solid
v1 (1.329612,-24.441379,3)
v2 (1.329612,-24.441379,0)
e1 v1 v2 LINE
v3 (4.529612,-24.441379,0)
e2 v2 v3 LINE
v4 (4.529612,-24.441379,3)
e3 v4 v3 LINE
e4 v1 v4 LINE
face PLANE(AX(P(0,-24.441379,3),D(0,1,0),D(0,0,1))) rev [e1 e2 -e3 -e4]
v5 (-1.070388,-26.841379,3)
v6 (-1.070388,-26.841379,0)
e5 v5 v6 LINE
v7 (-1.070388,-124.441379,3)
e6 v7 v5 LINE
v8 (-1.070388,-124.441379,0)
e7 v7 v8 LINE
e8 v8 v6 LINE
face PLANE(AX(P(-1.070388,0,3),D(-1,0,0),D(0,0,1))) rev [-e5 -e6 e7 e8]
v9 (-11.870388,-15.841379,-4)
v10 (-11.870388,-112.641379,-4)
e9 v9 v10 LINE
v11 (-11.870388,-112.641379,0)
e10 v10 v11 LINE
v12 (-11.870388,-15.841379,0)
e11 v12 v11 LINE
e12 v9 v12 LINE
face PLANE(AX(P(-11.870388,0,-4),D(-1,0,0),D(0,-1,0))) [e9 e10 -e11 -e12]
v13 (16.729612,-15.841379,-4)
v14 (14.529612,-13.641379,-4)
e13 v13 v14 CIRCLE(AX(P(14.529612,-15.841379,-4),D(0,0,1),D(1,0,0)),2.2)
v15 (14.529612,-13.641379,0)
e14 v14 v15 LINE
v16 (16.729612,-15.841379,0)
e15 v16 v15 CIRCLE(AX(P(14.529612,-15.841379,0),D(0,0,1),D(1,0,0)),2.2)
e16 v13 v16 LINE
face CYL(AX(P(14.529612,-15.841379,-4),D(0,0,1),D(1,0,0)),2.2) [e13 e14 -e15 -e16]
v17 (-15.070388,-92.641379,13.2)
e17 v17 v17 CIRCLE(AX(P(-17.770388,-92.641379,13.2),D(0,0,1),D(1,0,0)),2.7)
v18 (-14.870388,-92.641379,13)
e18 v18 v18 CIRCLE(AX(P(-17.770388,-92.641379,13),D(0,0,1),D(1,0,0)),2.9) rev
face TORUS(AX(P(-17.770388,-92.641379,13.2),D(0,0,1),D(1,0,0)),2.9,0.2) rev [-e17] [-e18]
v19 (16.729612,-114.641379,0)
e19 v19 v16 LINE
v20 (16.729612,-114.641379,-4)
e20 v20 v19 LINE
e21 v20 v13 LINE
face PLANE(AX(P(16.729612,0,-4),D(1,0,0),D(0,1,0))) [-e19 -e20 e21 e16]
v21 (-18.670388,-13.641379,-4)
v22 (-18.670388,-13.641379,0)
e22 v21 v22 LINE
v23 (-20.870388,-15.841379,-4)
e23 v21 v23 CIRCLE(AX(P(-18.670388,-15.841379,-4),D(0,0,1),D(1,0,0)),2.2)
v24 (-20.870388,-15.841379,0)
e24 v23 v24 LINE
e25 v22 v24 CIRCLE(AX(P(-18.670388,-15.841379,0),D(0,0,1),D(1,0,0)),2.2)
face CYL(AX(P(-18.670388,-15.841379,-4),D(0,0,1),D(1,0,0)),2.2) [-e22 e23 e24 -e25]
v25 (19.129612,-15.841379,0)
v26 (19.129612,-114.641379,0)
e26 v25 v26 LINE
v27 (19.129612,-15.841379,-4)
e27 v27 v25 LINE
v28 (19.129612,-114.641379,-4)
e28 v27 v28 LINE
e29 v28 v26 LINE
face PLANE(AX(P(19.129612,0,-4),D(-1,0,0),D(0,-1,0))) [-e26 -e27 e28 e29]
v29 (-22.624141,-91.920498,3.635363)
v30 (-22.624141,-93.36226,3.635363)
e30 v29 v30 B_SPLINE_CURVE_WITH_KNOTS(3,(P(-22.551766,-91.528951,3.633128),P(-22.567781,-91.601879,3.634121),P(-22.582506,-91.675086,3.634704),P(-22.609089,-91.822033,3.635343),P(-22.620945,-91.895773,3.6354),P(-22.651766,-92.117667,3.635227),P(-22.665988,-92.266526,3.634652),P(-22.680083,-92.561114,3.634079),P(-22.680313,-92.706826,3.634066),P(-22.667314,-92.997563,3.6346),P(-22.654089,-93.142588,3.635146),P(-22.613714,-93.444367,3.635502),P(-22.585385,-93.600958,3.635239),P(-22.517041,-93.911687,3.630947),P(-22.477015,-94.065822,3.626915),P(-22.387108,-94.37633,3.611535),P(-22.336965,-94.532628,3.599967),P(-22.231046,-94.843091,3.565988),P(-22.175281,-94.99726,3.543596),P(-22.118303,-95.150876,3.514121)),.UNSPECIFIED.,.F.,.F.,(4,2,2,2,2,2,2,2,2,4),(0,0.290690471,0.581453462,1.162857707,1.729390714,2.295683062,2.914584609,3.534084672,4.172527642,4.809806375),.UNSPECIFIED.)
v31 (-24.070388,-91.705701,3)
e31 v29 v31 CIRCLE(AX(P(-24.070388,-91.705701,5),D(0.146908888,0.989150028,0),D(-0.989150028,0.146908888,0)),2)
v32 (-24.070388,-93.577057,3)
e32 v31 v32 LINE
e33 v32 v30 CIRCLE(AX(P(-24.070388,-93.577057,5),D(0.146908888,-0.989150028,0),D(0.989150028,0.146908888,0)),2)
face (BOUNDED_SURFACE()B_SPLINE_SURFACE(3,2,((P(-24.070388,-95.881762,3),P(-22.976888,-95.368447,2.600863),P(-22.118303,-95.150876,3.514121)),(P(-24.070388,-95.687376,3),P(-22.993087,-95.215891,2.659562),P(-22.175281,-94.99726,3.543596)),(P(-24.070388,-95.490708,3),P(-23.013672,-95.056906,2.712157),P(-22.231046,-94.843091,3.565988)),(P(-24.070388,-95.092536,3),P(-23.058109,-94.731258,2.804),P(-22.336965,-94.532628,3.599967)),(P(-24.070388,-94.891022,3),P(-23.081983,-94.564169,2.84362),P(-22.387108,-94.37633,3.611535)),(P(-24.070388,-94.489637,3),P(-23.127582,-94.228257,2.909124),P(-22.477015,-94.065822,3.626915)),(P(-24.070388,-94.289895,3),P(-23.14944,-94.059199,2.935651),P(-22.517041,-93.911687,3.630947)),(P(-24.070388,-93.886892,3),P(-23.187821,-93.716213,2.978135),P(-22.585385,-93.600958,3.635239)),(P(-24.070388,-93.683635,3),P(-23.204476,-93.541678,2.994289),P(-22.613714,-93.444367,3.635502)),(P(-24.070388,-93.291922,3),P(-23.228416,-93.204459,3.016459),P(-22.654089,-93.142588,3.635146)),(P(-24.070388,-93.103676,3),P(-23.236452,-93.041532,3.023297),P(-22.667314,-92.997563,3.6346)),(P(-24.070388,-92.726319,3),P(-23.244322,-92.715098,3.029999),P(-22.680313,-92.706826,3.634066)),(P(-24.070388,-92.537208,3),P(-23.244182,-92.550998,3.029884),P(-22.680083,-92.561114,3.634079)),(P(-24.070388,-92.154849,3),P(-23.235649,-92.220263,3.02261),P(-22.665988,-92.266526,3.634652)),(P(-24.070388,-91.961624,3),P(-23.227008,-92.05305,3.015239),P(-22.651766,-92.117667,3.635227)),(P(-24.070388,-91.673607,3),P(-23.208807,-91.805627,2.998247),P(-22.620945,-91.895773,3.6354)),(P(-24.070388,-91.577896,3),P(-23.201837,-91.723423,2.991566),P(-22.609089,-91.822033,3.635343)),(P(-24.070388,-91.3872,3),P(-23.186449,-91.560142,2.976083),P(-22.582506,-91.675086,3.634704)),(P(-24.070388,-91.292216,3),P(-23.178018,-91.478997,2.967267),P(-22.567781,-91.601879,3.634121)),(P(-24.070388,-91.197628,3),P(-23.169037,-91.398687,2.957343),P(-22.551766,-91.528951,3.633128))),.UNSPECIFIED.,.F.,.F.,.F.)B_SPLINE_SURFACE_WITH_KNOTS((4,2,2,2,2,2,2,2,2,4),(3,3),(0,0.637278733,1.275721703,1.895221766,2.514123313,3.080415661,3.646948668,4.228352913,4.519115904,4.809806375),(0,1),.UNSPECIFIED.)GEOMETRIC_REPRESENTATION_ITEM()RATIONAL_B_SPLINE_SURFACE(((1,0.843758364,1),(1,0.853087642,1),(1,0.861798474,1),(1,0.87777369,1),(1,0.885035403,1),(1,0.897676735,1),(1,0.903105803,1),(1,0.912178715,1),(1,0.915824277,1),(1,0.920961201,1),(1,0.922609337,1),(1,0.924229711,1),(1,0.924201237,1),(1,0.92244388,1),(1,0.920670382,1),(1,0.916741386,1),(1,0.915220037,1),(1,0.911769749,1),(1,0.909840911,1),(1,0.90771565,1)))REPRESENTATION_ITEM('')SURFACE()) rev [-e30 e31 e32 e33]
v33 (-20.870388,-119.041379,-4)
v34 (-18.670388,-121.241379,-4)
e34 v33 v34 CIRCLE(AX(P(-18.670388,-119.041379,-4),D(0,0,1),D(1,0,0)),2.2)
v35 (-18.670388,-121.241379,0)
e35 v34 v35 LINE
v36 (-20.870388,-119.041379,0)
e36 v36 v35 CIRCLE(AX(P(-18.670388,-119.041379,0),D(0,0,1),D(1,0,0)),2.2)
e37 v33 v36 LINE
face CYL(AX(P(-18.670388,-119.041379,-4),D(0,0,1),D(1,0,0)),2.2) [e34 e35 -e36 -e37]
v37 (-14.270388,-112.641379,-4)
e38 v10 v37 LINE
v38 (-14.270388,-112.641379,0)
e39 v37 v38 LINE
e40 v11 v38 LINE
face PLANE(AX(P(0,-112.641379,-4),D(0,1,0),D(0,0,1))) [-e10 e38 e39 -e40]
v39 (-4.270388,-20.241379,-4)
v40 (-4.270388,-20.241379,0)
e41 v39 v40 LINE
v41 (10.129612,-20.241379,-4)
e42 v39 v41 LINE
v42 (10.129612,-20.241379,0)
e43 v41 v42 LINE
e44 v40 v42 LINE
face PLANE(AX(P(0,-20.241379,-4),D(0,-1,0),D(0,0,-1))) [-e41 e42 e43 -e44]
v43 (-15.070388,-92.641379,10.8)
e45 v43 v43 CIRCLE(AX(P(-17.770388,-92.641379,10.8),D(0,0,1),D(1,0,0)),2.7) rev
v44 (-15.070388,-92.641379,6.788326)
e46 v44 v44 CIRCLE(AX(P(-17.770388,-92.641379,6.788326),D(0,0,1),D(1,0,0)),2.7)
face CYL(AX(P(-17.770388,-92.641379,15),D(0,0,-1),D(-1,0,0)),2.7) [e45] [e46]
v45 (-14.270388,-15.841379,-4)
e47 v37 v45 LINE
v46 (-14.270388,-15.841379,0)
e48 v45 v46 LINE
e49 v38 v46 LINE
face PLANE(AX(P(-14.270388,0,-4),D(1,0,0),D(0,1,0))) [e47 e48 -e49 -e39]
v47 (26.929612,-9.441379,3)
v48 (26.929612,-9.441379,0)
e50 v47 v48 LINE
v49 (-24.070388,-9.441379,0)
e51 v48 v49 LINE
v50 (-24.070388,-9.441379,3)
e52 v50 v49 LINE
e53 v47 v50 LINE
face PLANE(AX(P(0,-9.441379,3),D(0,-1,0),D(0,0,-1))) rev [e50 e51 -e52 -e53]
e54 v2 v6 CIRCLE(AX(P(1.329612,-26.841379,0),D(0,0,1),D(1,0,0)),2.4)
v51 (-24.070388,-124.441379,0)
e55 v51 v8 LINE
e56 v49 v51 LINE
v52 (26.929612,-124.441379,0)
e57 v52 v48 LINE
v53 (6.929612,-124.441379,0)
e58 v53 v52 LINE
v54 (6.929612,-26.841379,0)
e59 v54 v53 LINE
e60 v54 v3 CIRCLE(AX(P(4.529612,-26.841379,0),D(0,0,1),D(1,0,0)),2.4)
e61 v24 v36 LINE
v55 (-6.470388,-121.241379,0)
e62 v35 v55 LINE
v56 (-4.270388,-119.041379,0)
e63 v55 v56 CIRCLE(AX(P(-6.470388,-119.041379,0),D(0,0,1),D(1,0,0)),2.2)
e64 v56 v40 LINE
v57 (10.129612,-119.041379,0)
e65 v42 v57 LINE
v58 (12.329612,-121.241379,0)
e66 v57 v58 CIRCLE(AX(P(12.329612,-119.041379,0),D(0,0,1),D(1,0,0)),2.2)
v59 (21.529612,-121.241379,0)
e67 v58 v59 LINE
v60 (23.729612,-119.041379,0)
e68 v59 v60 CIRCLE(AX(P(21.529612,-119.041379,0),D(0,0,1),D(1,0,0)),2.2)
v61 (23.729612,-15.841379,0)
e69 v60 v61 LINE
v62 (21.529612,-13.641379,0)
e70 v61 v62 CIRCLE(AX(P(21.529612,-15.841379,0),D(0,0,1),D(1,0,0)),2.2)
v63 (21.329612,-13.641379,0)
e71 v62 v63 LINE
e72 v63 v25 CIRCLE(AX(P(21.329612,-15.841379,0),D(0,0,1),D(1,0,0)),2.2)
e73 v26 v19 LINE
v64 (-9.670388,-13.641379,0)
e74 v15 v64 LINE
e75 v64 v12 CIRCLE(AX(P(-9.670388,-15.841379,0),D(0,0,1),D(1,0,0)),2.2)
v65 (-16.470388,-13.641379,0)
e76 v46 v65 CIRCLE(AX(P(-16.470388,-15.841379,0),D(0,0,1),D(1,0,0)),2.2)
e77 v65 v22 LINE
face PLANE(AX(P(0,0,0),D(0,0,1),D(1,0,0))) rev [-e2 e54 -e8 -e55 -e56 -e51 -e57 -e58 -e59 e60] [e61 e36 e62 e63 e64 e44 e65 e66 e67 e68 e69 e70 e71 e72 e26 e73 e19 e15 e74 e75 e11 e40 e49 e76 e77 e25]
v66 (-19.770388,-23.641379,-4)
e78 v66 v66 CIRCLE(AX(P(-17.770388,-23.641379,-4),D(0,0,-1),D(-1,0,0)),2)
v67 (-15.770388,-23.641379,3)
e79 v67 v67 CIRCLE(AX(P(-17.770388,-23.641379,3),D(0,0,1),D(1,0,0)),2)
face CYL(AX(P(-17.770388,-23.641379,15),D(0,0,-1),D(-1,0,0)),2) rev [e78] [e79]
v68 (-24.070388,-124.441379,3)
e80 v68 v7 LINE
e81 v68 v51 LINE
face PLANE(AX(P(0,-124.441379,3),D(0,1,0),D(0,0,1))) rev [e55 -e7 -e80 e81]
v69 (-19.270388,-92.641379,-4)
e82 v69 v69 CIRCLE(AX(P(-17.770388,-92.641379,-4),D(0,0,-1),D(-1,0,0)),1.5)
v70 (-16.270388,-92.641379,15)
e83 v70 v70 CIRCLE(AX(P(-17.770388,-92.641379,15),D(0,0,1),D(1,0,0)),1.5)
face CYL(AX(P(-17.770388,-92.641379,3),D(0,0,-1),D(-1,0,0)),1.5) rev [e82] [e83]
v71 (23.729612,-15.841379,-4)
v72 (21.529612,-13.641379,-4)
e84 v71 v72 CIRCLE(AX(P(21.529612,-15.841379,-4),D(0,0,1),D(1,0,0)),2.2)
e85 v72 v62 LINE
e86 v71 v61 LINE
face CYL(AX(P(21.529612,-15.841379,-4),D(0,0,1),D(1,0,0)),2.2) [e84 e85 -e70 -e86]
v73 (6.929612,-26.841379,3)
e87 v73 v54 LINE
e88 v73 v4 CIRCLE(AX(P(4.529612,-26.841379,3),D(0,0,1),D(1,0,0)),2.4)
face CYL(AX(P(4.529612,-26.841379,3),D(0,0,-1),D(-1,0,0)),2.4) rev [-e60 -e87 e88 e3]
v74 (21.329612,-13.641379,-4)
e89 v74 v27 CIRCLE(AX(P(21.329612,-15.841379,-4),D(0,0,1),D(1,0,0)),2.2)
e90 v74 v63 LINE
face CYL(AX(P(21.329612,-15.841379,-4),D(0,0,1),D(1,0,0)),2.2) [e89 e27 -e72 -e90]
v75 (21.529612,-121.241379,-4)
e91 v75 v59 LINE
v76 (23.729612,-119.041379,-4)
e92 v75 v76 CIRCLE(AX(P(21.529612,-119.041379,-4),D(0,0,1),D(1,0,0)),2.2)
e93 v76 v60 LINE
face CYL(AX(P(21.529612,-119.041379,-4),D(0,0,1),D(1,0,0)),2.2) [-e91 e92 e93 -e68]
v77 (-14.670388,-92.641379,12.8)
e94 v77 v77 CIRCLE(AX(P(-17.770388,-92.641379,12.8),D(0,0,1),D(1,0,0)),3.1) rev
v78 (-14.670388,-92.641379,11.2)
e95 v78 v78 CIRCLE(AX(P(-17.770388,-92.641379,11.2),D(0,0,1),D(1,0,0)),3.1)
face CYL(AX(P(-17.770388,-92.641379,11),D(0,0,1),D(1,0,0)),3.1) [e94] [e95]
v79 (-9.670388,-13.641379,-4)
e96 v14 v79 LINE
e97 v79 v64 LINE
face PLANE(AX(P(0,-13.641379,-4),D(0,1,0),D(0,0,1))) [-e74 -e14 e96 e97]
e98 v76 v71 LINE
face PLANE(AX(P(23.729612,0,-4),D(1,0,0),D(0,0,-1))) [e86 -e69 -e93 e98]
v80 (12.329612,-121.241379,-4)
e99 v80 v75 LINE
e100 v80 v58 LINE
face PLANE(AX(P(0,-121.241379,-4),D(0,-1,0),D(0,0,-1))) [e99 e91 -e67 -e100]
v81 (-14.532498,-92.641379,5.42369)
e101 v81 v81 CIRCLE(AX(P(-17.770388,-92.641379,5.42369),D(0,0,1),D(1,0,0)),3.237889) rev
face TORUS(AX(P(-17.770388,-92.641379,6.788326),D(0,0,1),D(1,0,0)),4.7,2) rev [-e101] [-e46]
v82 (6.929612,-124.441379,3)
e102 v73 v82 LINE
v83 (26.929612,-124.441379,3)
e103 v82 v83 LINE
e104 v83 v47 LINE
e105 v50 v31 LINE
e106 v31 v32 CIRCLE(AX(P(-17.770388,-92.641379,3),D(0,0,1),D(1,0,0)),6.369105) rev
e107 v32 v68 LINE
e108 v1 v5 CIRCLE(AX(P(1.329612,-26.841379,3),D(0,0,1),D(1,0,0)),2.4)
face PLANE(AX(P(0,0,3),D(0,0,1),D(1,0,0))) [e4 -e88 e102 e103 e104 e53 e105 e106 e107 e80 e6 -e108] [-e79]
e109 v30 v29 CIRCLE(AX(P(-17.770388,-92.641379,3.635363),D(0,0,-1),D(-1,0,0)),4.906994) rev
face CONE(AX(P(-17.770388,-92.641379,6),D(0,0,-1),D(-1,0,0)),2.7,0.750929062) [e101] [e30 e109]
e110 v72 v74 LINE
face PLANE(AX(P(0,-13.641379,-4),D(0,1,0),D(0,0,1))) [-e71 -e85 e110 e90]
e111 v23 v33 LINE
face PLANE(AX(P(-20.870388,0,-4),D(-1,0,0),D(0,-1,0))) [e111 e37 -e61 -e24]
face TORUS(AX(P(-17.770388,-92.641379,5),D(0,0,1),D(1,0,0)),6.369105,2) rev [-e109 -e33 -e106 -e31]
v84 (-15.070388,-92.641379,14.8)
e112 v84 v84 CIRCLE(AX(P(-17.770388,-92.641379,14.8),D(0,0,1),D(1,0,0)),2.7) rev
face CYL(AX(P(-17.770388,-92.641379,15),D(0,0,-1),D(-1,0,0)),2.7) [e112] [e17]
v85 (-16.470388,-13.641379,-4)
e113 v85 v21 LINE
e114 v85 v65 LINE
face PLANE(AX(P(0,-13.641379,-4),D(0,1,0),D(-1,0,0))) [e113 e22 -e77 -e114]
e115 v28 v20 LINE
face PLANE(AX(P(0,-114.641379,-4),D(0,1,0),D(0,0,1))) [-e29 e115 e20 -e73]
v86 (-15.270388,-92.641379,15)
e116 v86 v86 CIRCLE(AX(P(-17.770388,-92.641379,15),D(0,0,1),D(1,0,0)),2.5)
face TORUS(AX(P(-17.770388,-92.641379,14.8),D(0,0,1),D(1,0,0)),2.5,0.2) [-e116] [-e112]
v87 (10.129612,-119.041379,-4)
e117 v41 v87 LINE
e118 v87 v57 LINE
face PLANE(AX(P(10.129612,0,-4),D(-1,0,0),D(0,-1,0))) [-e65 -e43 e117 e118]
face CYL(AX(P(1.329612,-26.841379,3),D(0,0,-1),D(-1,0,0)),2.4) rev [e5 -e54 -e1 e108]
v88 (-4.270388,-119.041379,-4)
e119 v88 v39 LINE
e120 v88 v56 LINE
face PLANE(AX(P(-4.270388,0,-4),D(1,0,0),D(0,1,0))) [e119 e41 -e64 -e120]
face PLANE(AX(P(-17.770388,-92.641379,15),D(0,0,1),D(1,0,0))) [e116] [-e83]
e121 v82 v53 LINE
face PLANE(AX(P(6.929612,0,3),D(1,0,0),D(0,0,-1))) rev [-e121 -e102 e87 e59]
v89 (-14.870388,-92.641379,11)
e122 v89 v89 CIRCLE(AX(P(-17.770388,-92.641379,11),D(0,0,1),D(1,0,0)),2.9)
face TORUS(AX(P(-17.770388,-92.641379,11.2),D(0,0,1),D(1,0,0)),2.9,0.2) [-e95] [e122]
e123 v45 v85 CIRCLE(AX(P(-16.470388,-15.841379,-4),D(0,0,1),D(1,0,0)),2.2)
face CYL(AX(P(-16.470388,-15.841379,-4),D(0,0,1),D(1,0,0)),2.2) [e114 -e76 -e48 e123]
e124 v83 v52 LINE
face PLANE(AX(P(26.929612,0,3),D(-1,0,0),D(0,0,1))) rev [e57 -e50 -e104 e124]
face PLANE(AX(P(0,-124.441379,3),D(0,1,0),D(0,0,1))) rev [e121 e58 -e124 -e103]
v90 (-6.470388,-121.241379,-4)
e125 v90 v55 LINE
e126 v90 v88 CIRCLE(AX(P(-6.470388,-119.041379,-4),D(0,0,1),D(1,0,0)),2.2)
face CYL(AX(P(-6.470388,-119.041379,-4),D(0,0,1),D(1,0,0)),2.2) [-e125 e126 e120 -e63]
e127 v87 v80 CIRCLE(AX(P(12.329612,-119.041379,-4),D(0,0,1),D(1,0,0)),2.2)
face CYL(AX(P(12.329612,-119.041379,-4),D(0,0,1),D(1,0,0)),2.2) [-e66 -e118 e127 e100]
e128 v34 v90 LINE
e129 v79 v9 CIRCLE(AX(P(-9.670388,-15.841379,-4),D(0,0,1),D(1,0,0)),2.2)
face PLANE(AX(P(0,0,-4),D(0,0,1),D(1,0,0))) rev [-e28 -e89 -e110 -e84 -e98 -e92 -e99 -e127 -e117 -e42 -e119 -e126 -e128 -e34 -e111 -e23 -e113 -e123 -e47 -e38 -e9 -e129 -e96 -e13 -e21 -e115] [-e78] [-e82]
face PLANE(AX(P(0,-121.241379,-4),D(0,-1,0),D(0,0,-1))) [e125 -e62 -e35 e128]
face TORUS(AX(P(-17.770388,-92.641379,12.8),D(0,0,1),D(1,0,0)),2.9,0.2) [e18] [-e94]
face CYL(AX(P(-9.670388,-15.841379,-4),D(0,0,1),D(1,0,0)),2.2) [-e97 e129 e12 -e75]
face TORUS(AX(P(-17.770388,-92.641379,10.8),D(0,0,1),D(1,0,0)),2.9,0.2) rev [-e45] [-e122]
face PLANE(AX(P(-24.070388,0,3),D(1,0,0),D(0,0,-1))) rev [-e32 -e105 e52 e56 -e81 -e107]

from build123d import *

# Parameters (mm, degrees)
BOSS_EXTRUDE1_DEPTH = 4
BOSS_EXTRUDE2_DEPTH = 3
SKETCH2_R           = 1.5
CUT_EXTRUDE1_DEPTH  = 128.51415942
SKETCH3_R           = 5.5
SKETCH5_R           = 2.7
SKETCH5_35_R        = 2.7
SKETCH5_35_R_2      = 1.5
BOSS_EXTRUDE3_DEPTH = 9
SKETCH6_R           = 2
CUT_EXTRUDE2_DEPTH  = 129.731739881
BOSS_EXTRUDE4_START = -2
SKETCH4_R           = 3.1
SKETCH4_R_2         = 2.7
BOSS_EXTRUDE4_DEPTH = 2
FILLET1_R           = 2
FILLET2_R           = 0.2
SKETCH3_52_R        = 1.5
CUT_EXTRUDE3_DEPTH  = 128.886124648


with BuildPart() as part:
    # Sketch1 → Boss-Extrude1 (new body)
    with BuildSketch(Plane.XY):
        with BuildLine():
            Line((-20.870387638, -15.841379094), (-20.870387638, -119.041379094))
            ThreePointArc((-20.870387638, -119.041379094), (-20.226022556, -120.597014012), (-18.670387638, -121.241379094))
            Line((-18.670387638, -121.241379094), (-6.470387638, -121.241379094))
            ThreePointArc((-6.470387638, -121.241379094), (-4.914752719, -120.597014012), (-4.270387638, -119.041379094))
            Line((-4.270387638, -119.041379094), (-4.270387638, -20.241379094))
            Line((-4.270387638, -20.241379094), (10.129612362, -20.241379094))
            Line((10.129612362, -20.241379094), (10.129612362, -119.041379094))
            ThreePointArc((10.129612362, -119.041379094), (10.773977444, -120.597014012), (12.329612362, -121.241379094))
            Line((12.329612362, -121.241379094), (21.529612362, -121.241379094))
            ThreePointArc((21.529612362, -121.241379094), (23.085247281, -120.597014012), (23.729612362, -119.041379094))
            Line((23.729612362, -119.041379094), (23.729612362, -15.841379094))
            ThreePointArc((23.729612362, -15.841379094), (23.085247281, -14.285744175), (21.529612362, -13.641379094))
            Line((21.529612362, -13.641379094), (21.329612362, -13.641379094))
            ThreePointArc((21.329612362, -13.641379094), (19.773977444, -14.285744175), (19.129612362, -15.841379094))
            Line((19.129612362, -15.841379094), (19.129612362, -114.641379094))
            Line((19.129612362, -114.641379094), (16.729612362, -114.641379094))
            Line((16.729612362, -114.641379094), (16.729612362, -15.841379094))
            ThreePointArc((16.729612362, -15.841379094), (16.085247281, -14.285744175), (14.529612362, -13.641379094))
            Line((14.529612362, -13.641379094), (-9.670387638, -13.641379094))
            ThreePointArc((-9.670387638, -13.641379094), (-11.226022556, -14.285744175), (-11.870387638, -15.841379094))
            Line((-11.870387638, -15.841379094), (-11.870387638, -112.641379094))
            Line((-11.870387638, -112.641379094), (-14.270387638, -112.641379094))
            Line((-14.270387638, -112.641379094), (-14.270387638, -15.841379094))
            ThreePointArc((-14.270387638, -15.841379094), (-14.914752719, -14.285744175), (-16.470387638, -13.641379094))
            Line((-16.470387638, -13.641379094), (-18.670387638, -13.641379094))
            ThreePointArc((-18.670387638, -13.641379094), (-20.226022556, -14.285744175), (-20.870387638, -15.841379094))
        make_face()
    extrude(amount=-BOSS_EXTRUDE1_DEPTH)

    # Sketch1<3> → Boss-Extrude2 (add)
    with BuildSketch(Plane.XY):
        with BuildLine():
            Line((26.929612362, -9.441379094), (-24.070387638, -9.441379094))
            Line((-24.070387638, -9.441379094), (-24.070387638, -124.441379094))
            Line((-24.070387638, -124.441379094), (-1.070387638, -124.441379094))
            Line((-1.070387638, -124.441379094), (-1.070387638, -26.841379094))
            ThreePointArc((-1.070387638, -26.841379094), (-0.367443913, -25.144322819), (1.329612362, -24.441379094))
            Line((1.329612362, -24.441379094), (4.529612362, -24.441379094))
            ThreePointArc((4.529612362, -24.441379094), (6.226668637, -25.144322819), (6.929612362, -26.841379094))
            Line((6.929612362, -26.841379094), (6.929612362, -124.441379094))
            Line((6.929612362, -124.441379094), (26.929612362, -124.441379094))
            Line((26.929612362, -124.441379094), (26.929612362, -9.441379094))
        make_face()
    extrude(amount=BOSS_EXTRUDE2_DEPTH)

    # Sketch2 → Cut-Extrude1 (cut, through all)
    with BuildSketch(Plane(origin=(0, 0, -4), x_dir=(-1, 0, 0), z_dir=(0, 0, -1))):
        with Locations((17.770387638, -92.641379094)):
            Circle(SKETCH2_R)
    extrude(amount=-CUT_EXTRUDE1_DEPTH, mode=Mode.SUBTRACT)

    # Sketch3 → Loft2 section 0
    with BuildSketch(Plane.XY.offset(3)):
        with Locations((-17.770387638, -92.641379094)):
            Circle(SKETCH3_R)
    # Sketch5 → Loft2 section 1
    with BuildSketch(Plane.XY.offset(6)):
        with Locations((-17.770387638, -92.641379094)):
            Circle(SKETCH5_R)
    loft()

    # Sketch5<35> → Boss-Extrude3 (add)
    with BuildSketch(Plane.XY.offset(6)):
        with Locations((-17.770387638, -92.641379094)):
            Circle(SKETCH5_35_R)
        with Locations(Location((-17.770387638, -92.641379094, 0), (0, 0, 180))):
            Circle(SKETCH5_35_R_2, mode=Mode.SUBTRACT)
    extrude(amount=BOSS_EXTRUDE3_DEPTH)

    # Sketch6 → Cut-Extrude2 (cut, through all)
    with BuildSketch(Plane(origin=(0, 0, -4), x_dir=(-1, 0, 0), z_dir=(0, 0, -1))):
        with Locations((17.770387638, -23.641379094)):
            Circle(SKETCH6_R)
    extrude(amount=-CUT_EXTRUDE2_DEPTH, mode=Mode.SUBTRACT)

    # Sketch4 → Boss-Extrude4 (add)
    with BuildSketch(Plane.XY.offset(13).offset(BOSS_EXTRUDE4_START)):
        with Locations((-17.770387638, -92.641379094)):
            Circle(SKETCH4_R)
        with Locations((-17.770387638, -92.641379094)):
            Circle(SKETCH4_R_2, mode=Mode.SUBTRACT)
    extrude(amount=BOSS_EXTRUDE4_DEPTH)

    # Fillet1
    fillet1_edges = [part.edges().sort_by_distance(p)[0] for p in [
        (-20.470387638, -92.641379094, 6),
        (-23.270387638, -92.641379094, 3),
    ]]
    fillet(fillet1_edges, radius=FILLET1_R)

    # Fillet2
    fillet2_edges = [part.edges().sort_by_distance(p)[0] for p in [
        (-20.470387638, -92.641379094, 15),
        (-20.470387638, -92.641379094, 11),
        (-20.870387638, -92.641379094, 11),
        (-20.870387638, -92.641379094, 13),
        (-20.470387638, -92.641379094, 13),
    ]]
    fillet(fillet2_edges, radius=FILLET2_R - 0.0001)  # a hair under: the kernel refuses the full size

    # Sketch3<52> → Cut-Extrude3 (cut, through all)
    with BuildSketch(Plane.XY.offset(3)):
        with Locations(Location((-17.770387638, -92.641379094, 0), (0, 0, 180))):
            Circle(SKETCH3_52_R)
    extrude(amount=CUT_EXTRUDE3_DEPTH, mode=Mode.SUBTRACT)


solid = part.part
